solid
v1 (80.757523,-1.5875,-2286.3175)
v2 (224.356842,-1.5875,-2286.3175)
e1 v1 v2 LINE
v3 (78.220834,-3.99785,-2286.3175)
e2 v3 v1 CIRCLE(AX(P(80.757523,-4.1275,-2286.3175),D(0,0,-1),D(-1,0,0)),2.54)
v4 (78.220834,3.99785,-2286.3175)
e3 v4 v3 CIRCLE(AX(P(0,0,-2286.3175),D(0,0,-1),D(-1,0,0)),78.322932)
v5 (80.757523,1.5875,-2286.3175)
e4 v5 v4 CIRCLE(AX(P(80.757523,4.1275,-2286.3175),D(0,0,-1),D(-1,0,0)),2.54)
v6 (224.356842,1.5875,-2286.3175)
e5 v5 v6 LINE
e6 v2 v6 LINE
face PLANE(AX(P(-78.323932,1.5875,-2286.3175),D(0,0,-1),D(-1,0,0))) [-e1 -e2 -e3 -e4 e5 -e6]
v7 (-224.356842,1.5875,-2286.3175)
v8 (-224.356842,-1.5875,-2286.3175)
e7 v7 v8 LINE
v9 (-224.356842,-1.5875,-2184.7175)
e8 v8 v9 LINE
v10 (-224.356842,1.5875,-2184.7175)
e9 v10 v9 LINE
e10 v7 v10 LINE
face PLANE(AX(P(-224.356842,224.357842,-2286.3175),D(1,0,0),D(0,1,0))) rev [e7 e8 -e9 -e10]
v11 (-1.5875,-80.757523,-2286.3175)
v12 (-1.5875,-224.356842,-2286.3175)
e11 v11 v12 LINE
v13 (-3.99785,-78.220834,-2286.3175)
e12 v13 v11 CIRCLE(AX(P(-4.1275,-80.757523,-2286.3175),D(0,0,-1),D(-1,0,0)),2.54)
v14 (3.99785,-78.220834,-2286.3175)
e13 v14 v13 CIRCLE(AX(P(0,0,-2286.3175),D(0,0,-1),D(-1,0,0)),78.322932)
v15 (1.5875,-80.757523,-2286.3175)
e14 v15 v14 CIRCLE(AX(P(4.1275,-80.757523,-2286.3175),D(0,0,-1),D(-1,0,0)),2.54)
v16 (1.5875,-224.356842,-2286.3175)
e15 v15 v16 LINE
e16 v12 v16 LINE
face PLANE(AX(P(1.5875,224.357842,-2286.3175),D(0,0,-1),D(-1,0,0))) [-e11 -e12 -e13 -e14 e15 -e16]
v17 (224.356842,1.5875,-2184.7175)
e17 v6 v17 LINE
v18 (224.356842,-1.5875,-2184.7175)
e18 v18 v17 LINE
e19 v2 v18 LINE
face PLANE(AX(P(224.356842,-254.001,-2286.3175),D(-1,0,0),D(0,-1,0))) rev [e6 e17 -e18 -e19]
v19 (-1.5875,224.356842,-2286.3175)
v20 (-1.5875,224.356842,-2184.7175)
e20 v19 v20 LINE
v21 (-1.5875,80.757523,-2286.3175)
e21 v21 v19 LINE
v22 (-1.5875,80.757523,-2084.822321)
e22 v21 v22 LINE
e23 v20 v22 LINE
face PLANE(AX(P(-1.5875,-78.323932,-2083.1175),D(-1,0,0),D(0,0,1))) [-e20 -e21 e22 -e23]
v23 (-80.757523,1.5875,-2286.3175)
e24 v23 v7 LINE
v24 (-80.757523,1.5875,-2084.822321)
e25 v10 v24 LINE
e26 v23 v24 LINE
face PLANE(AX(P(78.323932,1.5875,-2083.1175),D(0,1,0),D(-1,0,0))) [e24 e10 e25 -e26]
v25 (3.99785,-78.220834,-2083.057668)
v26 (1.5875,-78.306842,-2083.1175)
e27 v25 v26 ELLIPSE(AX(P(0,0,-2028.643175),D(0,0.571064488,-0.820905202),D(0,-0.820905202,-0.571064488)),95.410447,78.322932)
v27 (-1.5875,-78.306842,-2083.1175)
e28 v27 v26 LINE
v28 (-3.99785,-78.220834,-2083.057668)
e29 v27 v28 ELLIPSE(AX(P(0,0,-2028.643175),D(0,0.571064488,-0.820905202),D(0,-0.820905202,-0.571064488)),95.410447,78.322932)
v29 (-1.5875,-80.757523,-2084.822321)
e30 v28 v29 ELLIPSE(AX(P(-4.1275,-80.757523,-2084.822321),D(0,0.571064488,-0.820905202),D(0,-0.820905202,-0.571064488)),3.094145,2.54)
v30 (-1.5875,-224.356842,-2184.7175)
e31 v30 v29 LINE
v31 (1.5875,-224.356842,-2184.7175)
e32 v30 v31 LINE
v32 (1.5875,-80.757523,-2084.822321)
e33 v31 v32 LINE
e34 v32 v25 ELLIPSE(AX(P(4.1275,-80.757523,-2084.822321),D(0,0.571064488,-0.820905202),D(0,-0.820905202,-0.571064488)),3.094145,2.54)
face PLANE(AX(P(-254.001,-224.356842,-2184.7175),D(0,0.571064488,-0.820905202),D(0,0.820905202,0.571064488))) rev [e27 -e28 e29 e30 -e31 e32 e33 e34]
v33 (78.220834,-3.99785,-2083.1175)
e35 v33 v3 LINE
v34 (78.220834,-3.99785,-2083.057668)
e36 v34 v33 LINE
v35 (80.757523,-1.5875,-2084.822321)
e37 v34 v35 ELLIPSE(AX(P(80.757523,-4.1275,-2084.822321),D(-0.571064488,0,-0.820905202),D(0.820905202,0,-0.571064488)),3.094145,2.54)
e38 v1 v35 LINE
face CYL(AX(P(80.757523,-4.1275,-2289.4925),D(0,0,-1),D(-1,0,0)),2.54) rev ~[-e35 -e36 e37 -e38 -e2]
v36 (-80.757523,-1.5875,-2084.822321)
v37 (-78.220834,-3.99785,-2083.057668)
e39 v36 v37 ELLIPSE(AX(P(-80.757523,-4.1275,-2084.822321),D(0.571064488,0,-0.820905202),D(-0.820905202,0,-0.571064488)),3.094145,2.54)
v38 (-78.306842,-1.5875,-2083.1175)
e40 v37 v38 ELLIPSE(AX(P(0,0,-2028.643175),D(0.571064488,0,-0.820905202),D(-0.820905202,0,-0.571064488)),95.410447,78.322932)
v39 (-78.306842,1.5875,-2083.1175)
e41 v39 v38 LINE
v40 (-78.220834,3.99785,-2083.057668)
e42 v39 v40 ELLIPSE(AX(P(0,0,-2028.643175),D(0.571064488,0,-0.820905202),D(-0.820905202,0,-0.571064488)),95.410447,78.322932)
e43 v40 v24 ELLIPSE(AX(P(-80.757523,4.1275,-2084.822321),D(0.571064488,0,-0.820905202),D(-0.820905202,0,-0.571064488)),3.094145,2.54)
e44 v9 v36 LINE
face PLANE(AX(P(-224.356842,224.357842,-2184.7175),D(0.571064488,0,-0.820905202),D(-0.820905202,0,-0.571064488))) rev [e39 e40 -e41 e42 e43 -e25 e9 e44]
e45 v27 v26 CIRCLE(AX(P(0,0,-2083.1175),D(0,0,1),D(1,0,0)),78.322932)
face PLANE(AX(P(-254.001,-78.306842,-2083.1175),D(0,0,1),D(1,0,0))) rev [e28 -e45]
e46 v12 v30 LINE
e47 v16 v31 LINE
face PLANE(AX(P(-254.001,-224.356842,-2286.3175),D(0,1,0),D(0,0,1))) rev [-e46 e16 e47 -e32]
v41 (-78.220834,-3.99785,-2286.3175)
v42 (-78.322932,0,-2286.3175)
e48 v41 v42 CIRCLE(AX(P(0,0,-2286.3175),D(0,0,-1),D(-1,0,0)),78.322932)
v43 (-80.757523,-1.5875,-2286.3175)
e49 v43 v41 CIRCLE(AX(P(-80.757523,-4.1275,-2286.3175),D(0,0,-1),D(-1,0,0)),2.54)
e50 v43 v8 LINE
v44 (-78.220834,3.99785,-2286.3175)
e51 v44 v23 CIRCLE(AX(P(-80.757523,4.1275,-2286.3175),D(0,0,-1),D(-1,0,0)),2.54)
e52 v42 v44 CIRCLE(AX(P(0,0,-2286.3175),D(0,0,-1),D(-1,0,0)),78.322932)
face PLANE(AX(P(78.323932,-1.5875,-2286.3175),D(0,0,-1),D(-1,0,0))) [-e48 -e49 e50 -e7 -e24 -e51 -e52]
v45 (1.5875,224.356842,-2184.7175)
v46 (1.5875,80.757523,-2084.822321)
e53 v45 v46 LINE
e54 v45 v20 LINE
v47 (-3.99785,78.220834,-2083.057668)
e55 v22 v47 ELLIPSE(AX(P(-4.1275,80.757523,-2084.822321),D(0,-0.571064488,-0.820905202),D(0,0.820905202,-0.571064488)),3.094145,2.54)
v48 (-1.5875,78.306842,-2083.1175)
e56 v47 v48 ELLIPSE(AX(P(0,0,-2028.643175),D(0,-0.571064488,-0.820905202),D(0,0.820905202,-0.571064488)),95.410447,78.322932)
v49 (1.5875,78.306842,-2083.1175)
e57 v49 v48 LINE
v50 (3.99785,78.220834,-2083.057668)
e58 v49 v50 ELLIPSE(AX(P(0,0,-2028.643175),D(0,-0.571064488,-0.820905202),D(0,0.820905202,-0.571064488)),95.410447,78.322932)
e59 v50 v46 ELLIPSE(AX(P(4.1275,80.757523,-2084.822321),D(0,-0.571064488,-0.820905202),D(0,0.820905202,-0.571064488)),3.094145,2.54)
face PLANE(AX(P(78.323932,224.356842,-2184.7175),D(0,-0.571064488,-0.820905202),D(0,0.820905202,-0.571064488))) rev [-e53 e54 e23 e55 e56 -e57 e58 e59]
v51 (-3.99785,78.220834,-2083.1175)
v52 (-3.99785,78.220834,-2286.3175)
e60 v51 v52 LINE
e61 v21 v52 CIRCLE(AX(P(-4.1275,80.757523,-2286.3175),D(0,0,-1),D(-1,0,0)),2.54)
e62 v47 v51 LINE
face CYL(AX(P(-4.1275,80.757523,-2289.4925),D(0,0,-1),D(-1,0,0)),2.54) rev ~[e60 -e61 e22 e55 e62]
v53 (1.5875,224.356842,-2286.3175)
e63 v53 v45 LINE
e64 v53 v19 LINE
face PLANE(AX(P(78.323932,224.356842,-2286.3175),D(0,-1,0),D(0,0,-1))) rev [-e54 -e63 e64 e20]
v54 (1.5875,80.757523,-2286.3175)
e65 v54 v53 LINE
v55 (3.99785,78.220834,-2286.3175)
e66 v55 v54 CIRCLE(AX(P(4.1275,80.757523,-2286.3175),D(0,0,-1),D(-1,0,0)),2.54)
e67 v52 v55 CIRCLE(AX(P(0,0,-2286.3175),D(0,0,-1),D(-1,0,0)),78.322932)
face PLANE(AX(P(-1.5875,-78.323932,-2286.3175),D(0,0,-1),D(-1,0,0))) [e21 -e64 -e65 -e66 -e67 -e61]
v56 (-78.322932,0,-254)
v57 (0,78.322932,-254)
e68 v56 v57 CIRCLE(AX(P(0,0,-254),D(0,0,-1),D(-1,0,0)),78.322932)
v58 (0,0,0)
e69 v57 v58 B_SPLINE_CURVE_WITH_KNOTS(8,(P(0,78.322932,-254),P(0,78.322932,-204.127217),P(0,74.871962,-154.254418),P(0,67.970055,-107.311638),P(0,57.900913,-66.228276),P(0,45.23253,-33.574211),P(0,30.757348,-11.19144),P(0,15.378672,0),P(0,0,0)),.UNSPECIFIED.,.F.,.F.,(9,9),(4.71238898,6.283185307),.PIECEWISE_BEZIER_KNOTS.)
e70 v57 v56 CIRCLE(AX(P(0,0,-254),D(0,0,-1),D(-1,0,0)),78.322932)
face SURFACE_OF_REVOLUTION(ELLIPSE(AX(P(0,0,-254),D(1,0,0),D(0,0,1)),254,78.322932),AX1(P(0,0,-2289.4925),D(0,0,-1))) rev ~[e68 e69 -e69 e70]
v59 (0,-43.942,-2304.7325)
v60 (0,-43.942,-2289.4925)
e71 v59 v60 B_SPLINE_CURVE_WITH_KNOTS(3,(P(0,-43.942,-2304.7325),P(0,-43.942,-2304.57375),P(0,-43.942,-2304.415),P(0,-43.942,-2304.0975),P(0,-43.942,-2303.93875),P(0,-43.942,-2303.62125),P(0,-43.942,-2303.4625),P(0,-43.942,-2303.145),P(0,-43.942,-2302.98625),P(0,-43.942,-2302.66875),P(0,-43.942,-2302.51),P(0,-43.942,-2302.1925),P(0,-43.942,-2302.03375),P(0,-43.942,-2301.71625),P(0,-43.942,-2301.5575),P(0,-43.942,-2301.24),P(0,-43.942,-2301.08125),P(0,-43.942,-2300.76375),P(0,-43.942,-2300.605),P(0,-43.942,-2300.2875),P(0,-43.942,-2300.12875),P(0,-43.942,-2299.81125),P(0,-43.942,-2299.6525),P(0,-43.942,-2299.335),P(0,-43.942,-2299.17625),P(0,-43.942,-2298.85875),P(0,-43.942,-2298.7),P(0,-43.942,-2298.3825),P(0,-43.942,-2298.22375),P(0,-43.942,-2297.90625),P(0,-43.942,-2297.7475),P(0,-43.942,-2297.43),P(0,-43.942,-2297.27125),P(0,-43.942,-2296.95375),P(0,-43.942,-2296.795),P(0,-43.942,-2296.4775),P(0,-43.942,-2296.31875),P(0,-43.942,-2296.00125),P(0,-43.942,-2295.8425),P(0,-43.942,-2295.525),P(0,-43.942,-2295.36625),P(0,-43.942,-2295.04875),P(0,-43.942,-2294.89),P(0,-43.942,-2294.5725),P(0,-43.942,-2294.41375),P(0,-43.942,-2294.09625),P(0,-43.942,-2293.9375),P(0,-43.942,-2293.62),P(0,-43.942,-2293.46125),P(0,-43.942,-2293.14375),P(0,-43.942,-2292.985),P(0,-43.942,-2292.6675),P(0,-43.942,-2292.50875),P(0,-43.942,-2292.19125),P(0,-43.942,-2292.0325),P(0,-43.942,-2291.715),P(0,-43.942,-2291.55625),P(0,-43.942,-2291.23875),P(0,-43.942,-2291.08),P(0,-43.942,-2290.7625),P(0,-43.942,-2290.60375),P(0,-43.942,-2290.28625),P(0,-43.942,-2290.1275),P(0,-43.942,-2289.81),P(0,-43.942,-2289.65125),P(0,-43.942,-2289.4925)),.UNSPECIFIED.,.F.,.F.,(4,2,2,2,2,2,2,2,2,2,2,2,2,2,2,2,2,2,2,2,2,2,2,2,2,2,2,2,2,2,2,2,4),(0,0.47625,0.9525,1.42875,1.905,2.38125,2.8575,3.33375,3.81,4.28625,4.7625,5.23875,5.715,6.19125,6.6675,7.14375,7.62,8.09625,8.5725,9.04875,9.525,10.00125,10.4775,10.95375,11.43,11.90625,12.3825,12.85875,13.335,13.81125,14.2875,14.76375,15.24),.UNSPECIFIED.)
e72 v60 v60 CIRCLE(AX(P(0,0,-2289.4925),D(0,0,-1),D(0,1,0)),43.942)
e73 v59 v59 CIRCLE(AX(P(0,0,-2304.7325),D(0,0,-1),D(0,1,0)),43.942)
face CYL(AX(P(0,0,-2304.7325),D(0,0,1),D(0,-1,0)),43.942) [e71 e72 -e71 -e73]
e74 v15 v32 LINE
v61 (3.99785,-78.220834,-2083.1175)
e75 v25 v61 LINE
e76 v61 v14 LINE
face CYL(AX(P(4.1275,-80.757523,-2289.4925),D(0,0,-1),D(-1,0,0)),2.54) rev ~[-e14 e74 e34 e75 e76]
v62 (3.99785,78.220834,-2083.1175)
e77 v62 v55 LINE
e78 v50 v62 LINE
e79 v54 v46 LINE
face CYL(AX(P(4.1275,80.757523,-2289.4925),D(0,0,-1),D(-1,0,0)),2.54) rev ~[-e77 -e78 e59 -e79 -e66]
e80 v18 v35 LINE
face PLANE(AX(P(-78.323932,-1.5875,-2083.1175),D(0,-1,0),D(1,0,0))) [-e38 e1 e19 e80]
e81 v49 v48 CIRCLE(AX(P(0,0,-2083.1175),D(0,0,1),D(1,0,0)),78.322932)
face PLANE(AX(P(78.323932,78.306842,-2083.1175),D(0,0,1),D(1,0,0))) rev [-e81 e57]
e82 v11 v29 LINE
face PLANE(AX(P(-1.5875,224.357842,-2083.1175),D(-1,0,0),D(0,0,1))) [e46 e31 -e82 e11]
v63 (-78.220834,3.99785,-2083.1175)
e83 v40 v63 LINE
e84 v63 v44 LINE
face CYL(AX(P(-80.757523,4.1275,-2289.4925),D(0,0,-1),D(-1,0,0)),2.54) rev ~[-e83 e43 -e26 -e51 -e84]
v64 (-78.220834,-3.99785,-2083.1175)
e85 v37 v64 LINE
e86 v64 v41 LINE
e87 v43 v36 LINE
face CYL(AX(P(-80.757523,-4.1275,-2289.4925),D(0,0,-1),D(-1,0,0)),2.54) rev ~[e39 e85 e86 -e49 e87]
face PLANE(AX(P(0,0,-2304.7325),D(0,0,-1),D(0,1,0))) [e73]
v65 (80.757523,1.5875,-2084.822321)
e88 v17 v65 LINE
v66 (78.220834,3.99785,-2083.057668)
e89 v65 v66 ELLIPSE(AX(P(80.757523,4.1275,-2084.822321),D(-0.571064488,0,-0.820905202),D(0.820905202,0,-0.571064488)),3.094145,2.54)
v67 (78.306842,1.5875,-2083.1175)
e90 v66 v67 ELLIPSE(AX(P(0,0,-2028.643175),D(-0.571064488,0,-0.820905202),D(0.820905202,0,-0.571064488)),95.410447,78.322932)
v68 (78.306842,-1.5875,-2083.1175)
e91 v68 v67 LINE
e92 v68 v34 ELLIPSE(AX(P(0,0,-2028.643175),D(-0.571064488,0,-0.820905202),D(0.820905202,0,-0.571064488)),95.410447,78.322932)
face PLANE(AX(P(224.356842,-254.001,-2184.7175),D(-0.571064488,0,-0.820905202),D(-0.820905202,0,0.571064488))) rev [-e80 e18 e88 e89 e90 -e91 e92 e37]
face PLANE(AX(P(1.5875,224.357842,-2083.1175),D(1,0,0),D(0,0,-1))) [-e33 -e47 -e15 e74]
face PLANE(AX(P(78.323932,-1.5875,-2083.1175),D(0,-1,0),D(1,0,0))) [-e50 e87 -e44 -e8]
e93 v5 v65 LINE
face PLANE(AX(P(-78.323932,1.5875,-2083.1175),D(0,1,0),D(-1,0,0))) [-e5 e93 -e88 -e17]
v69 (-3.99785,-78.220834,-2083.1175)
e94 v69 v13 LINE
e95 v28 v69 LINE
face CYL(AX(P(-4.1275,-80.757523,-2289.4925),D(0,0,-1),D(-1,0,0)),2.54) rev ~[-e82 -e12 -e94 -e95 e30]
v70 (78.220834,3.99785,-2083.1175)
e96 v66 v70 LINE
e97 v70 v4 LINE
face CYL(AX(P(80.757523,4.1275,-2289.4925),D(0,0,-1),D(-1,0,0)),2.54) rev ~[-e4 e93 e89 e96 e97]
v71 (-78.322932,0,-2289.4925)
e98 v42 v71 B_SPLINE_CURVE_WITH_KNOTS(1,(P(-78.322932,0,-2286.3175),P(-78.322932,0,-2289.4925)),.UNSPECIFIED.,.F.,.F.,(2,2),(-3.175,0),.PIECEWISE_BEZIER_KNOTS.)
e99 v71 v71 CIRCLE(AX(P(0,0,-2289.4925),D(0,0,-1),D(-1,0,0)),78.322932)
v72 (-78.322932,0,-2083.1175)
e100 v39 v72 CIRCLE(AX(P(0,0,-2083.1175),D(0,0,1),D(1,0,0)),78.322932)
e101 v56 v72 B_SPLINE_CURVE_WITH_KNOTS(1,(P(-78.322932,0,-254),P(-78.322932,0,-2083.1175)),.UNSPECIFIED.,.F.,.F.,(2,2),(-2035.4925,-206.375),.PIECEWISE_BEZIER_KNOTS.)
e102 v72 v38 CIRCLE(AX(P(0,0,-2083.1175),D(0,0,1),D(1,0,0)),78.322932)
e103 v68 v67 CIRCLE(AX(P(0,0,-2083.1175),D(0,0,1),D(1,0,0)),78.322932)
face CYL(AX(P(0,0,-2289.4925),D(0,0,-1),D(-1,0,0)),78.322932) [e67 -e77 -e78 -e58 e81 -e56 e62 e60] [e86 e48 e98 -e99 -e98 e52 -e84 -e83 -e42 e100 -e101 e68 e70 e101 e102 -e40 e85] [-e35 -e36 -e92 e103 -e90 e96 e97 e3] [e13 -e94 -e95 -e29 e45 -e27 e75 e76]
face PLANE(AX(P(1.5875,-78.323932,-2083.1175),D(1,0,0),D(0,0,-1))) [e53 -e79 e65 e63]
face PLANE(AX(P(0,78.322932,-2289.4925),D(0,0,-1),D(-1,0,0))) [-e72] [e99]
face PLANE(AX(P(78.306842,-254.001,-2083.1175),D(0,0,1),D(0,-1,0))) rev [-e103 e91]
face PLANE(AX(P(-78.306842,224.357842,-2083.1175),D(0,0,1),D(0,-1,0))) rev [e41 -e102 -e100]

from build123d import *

# Parameters (mm, degrees)
SKETCH3_R                = 43.942
BOSS_EXTRUDE1_DEPTH      = 15.24
BOSS_EXTRUDE2_REACH      = 2331.885
BOSS_EXTRUDE2_END_RADIUS = 78.322932
SKETCH4_W                = 3.175
SKETCH4_H                = 203.2
CUT_EXTRUDE1_REACH       = 2322.063
FILLET1_R                = 2.54
CIRPATTERN1_COUNT        = 4
FILLET1_OF_CIRPATTERN1_R = 2.54


with BuildPart() as part:
    # Sketch2 → Revolve1 (revolve)
    with BuildSketch(Plane(origin=(0, 0, 0), x_dir=(0, 0, -1), z_dir=(1, 0, 0)), mode=Mode.PRIVATE) as revolve1_sk:
        with BuildLine():
            Line((254, 78.322932), (2289.4925, 78.322932))
            Line((2289.4925, 78.322932), (2289.4925, 0))
            Line((2289.4925, 0), (0, 0))
            add(Edge.make_bspline(
                [(254, 78.322932), (0, 78.322932), (0, 0)],
                knots=[4.71238898, 4.71238898, 4.71238898, 6.283185307, 6.283185307, 6.283185307], degree=2, weights=[1, 0.707106781, 1]))
        make_face()
    revolve(revolve1_sk.sketch.rotate(Axis((0, 0, -2289.4925), (0, 0, 1)), 90), axis=Axis((0, 0, -2289.4925), (0, 0, 1)))

    # Sketch3 → Boss-Extrude1 (add)
    with BuildSketch(Plane(origin=(0, 0, -2289.4925), x_dir=(-1, 0, 0), z_dir=(0, 0, -1))):
        with Locations(Location((0, 0, 0), (0, 0, 270))):
            Circle(SKETCH3_R)
    extrude(amount=BOSS_EXTRUDE1_DEPTH)

    # Boss-Extrude2: up to this cylinder (the profile starts outside it)
    boss_extrude2_end = Plane(origin=(0, 0, -2184.7175), z_dir=(0, 0, -1)) * Cylinder(BOSS_EXTRUDE2_END_RADIUS, 4821.415864, mode=Mode.PRIVATE)
    # Sketch4 → Boss-Extrude2 (add, up to the surface)
    with BuildSketch(Plane(origin=(0, 254, 0), x_dir=(1, 0, 0), z_dir=(0, 1, 0)), mode=Mode.PRIVATE) as boss_extrude2_sk1:
        with Locations((0, 2184.7175)):
            Rectangle(SKETCH4_W, SKETCH4_H)
    boss_extrude2_tool1 = extrude(boss_extrude2_sk1.sketch, amount=-BOSS_EXTRUDE2_REACH, mode=Mode.PRIVATE) - boss_extrude2_end
    boss_extrude2 = boss_extrude2_tool1.solids().sort_by_distance((0, 254, -2184.7175))[0]
    add(boss_extrude2)

    # Sketch5 → Cut-Extrude1 (cut, up to next)
    with BuildSketch(Plane.ZY.offset(1.5875), mode=Mode.PRIVATE) as cut_extrude1_sk1:
        Polygon((-2286.3175, 224.356842107), (-2184.7175, 224.356842107), (-2083.1175, 78.306842107), (-2083.1175, 254), (-2286.3175, 254), align=None)
    cut_extrude1_tool1 = extrude(cut_extrude1_sk1.sketch, amount=-CUT_EXTRUDE1_REACH, mode=Mode.PRIVATE) & part.part
    cut_extrude1 = cut_extrude1_tool1.solids().sort_by_distance((-1.5875, 204.128915, -2147.334252))[0]
    add(cut_extrude1, mode=Mode.SUBTRACT)

    # Fillet1
    # the kernel refuses this fillet: 2.54 mm, written as the material it adds along each edge
    with BuildSketch(Plane(origin=(-1.5875, 78.306842107, -2076.990797857), x_dir=(-0.9993639751499004, -0.03566013422001241, 0), z_dir=(0, 0, -1))) as fillet1_piece_1_section:
        with BuildLine():
            CenterArc((2.450992889, 2.539698904), FILLET1_R, 182.043608468, 87.074170625)
            Line((-0.087391608, 2.449122163), (0, 0))
            ThreePointArc((0, 0), (1.205942189, 0.009284527), (2.411884379, 0))
        make_face()
    fillet1_piece_1 = extrude(amount=209.326702143, mode=Mode.PRIVATE)
    fillet1_piece_1 = split(fillet1_piece_1, bisect_by=Plane(origin=(-3.095055571, 78.248638535, -2083.077010558), z_dir=(0, -0.5710644881985995, -0.8209052017854874)), keep=Keep.TOP, mode=Mode.PRIVATE)
    add(fillet1_piece_1)
    with BuildSketch(Plane(origin=(1.5875, 78.306842107, -2076.990797857), x_dir=(0.9993639751499004, -0.035660134220013434, 0), z_dir=(0, 0, -1))) as fillet1_piece_2_section:
        with BuildLine():
            CenterArc((2.450992889, -2.539698904), FILLET1_R, 90.882220907, 87.074170625)
            Line((-0.087391608, -2.449122163), (0, 0))
            ThreePointArc((0, 0), (1.205942189, -0.009284527), (2.411884379, 0))
        make_face()
    fillet1_piece_2 = extrude(amount=209.326702143, mode=Mode.PRIVATE)
    fillet1_piece_2 = split(fillet1_piece_2, bisect_by=Plane(origin=(3.095055571, 78.248638535, -2083.077010558), z_dir=(0, -0.5710644881985995, -0.8209052017854874)), keep=Keep.TOP, mode=Mode.PRIVATE)
    add(fillet1_piece_2)

    # CirPattern1: Boss-Extrude2, Cut-Extrude1 ×4 about axis
    cirpattern1_axis = Axis((0, 0, 0), (0, 0, 1))
    add([boss_extrude2.rotate(cirpattern1_axis, i * 360 / CIRPATTERN1_COUNT) for i in range(1, CIRPATTERN1_COUNT)])
    add([cut_extrude1.rotate(cirpattern1_axis, i * 360 / CIRPATTERN1_COUNT) for i in range(1, CIRPATTERN1_COUNT)], mode=Mode.SUBTRACT)

    # Fillet1 of CirPattern1
    # the kernel refuses this fillet: 2.54 mm, written as the material it adds along each edge
    with BuildSketch(Plane(origin=(-78.306842107, -1.5875, -2076.990797857), x_dir=(0.035660134220018486, -0.9993639751499002, 0), z_dir=(0, 0, -1))) as fillet1_of_cirpattern1_piece_1_section:
        with BuildLine():
            CenterArc((2.450992889, 2.539698904), FILLET1_OF_CIRPATTERN1_R, 182.043608468, 87.074170625)
            Line((-0.087391608, 2.449122163), (0, 0))
            ThreePointArc((0, 0), (1.205942189, 0.009284527), (2.411884379, 0))
        make_face()
    fillet1_of_cirpattern1_piece_1 = extrude(amount=209.326702143, mode=Mode.PRIVATE)
    fillet1_of_cirpattern1_piece_1 = split(fillet1_of_cirpattern1_piece_1, bisect_by=Plane(origin=(-78.248638535, -3.095055571, -2083.077010558), z_dir=(0.5710644881985995, 0, -0.8209052017854874)), keep=Keep.TOP, mode=Mode.PRIVATE)
    add(fillet1_of_cirpattern1_piece_1)
    with BuildSketch(Plane(origin=(-78.306842107, 1.5875, -2076.990797857), x_dir=(0.03566013422001241, 0.9993639751499004, 0), z_dir=(0, 0, -1))) as fillet1_of_cirpattern1_piece_2_section:
        with BuildLine():
            CenterArc((2.450992889, -2.539698904), FILLET1_OF_CIRPATTERN1_R, 90.882220907, 87.074170625)
            Line((-0.087391608, -2.449122163), (0, 0))
            ThreePointArc((0, 0), (1.205942189, -0.009284527), (2.411884379, 0))
        make_face()
    fillet1_of_cirpattern1_piece_2 = extrude(amount=209.326702143, mode=Mode.PRIVATE)
    fillet1_of_cirpattern1_piece_2 = split(fillet1_of_cirpattern1_piece_2, bisect_by=Plane(origin=(-78.248638535, 3.095055571, -2083.077010558), z_dir=(0.5710644881985995, 0, -0.8209052017854874)), keep=Keep.TOP, mode=Mode.PRIVATE)
    add(fillet1_of_cirpattern1_piece_2)
    with BuildSketch(Plane(origin=(1.5875, -78.306842107, -2076.990797857), x_dir=(0.9993639751499002, 0.035660134220018555, 0), z_dir=(0, 0, -1))) as fillet1_of_cirpattern1_piece_3_section:
        with BuildLine():
            CenterArc((2.450992889, 2.539698904), FILLET1_OF_CIRPATTERN1_R, 182.043608468, 87.074170625)
            Line((-0.087391608, 2.449122163), (0, 0))
            ThreePointArc((0, 0), (1.205942189, 0.009284527), (2.411884379, 0))
        make_face()
    fillet1_of_cirpattern1_piece_3 = extrude(amount=209.326702143, mode=Mode.PRIVATE)
    fillet1_of_cirpattern1_piece_3 = split(fillet1_of_cirpattern1_piece_3, bisect_by=Plane(origin=(3.095055571, -78.248638535, -2083.077010558), z_dir=(0, 0.5710644881985995, -0.8209052017854874)), keep=Keep.TOP, mode=Mode.PRIVATE)
    add(fillet1_of_cirpattern1_piece_3)
    with BuildSketch(Plane(origin=(-1.5875, -78.306842107, -2076.990797857), x_dir=(-0.9993639751499004, 0.03566013422001239, 0), z_dir=(0, 0, -1))) as fillet1_of_cirpattern1_piece_4_section:
        with BuildLine():
            CenterArc((2.450992889, -2.539698904), FILLET1_OF_CIRPATTERN1_R, 90.882220907, 87.074170625)
            Line((-0.087391608, -2.449122163), (0, 0))
            ThreePointArc((0, 0), (1.205942189, -0.009284527), (2.411884379, 0))
        make_face()
    fillet1_of_cirpattern1_piece_4 = extrude(amount=209.326702143, mode=Mode.PRIVATE)
    fillet1_of_cirpattern1_piece_4 = split(fillet1_of_cirpattern1_piece_4, bisect_by=Plane(origin=(-3.095055571, -78.248638535, -2083.077010558), z_dir=(0, 0.5710644881985995, -0.8209052017854874)), keep=Keep.TOP, mode=Mode.PRIVATE)
    add(fillet1_of_cirpattern1_piece_4)
    with BuildSketch(Plane(origin=(78.306842107, 1.5875, -2076.990797857), x_dir=(-0.03566013422001241, 0.9993639751499004, 0), z_dir=(0, 0, -1))) as fillet1_of_cirpattern1_piece_5_section:
        with BuildLine():
            CenterArc((2.450992889, 2.539698904), FILLET1_OF_CIRPATTERN1_R, 182.043608468, 87.074170625)
            Line((-0.087391608, 2.449122163), (0, 0))
            ThreePointArc((0, 0), (1.205942189, 0.009284527), (2.411884379, 0))
        make_face()
    fillet1_of_cirpattern1_piece_5 = extrude(amount=209.326702143, mode=Mode.PRIVATE)
    fillet1_of_cirpattern1_piece_5 = split(fillet1_of_cirpattern1_piece_5, bisect_by=Plane(origin=(78.248638535, 3.095055571, -2083.077010558), z_dir=(-0.5710644881985995, 0, -0.8209052017854874)), keep=Keep.TOP, mode=Mode.PRIVATE)
    add(fillet1_of_cirpattern1_piece_5)
    with BuildSketch(Plane(origin=(78.306842107, -1.5875, -2076.990797857), x_dir=(-0.03566013422001239, -0.9993639751499004, 0), z_dir=(0, 0, -1))) as fillet1_of_cirpattern1_piece_6_section:
        with BuildLine():
            CenterArc((2.450992889, -2.539698904), FILLET1_OF_CIRPATTERN1_R, 90.882220907, 87.074170625)
            Line((-0.087391608, -2.449122163), (0, 0))
            ThreePointArc((0, 0), (1.205942189, -0.009284527), (2.411884379, 0))
        make_face()
    fillet1_of_cirpattern1_piece_6 = extrude(amount=209.326702143, mode=Mode.PRIVATE)
    fillet1_of_cirpattern1_piece_6 = split(fillet1_of_cirpattern1_piece_6, bisect_by=Plane(origin=(78.248638535, -3.095055571, -2083.077010558), z_dir=(-0.5710644881985995, 0, -0.8209052017854874)), keep=Keep.TOP, mode=Mode.PRIVATE)
    add(fillet1_of_cirpattern1_piece_6)


solid = part.part
